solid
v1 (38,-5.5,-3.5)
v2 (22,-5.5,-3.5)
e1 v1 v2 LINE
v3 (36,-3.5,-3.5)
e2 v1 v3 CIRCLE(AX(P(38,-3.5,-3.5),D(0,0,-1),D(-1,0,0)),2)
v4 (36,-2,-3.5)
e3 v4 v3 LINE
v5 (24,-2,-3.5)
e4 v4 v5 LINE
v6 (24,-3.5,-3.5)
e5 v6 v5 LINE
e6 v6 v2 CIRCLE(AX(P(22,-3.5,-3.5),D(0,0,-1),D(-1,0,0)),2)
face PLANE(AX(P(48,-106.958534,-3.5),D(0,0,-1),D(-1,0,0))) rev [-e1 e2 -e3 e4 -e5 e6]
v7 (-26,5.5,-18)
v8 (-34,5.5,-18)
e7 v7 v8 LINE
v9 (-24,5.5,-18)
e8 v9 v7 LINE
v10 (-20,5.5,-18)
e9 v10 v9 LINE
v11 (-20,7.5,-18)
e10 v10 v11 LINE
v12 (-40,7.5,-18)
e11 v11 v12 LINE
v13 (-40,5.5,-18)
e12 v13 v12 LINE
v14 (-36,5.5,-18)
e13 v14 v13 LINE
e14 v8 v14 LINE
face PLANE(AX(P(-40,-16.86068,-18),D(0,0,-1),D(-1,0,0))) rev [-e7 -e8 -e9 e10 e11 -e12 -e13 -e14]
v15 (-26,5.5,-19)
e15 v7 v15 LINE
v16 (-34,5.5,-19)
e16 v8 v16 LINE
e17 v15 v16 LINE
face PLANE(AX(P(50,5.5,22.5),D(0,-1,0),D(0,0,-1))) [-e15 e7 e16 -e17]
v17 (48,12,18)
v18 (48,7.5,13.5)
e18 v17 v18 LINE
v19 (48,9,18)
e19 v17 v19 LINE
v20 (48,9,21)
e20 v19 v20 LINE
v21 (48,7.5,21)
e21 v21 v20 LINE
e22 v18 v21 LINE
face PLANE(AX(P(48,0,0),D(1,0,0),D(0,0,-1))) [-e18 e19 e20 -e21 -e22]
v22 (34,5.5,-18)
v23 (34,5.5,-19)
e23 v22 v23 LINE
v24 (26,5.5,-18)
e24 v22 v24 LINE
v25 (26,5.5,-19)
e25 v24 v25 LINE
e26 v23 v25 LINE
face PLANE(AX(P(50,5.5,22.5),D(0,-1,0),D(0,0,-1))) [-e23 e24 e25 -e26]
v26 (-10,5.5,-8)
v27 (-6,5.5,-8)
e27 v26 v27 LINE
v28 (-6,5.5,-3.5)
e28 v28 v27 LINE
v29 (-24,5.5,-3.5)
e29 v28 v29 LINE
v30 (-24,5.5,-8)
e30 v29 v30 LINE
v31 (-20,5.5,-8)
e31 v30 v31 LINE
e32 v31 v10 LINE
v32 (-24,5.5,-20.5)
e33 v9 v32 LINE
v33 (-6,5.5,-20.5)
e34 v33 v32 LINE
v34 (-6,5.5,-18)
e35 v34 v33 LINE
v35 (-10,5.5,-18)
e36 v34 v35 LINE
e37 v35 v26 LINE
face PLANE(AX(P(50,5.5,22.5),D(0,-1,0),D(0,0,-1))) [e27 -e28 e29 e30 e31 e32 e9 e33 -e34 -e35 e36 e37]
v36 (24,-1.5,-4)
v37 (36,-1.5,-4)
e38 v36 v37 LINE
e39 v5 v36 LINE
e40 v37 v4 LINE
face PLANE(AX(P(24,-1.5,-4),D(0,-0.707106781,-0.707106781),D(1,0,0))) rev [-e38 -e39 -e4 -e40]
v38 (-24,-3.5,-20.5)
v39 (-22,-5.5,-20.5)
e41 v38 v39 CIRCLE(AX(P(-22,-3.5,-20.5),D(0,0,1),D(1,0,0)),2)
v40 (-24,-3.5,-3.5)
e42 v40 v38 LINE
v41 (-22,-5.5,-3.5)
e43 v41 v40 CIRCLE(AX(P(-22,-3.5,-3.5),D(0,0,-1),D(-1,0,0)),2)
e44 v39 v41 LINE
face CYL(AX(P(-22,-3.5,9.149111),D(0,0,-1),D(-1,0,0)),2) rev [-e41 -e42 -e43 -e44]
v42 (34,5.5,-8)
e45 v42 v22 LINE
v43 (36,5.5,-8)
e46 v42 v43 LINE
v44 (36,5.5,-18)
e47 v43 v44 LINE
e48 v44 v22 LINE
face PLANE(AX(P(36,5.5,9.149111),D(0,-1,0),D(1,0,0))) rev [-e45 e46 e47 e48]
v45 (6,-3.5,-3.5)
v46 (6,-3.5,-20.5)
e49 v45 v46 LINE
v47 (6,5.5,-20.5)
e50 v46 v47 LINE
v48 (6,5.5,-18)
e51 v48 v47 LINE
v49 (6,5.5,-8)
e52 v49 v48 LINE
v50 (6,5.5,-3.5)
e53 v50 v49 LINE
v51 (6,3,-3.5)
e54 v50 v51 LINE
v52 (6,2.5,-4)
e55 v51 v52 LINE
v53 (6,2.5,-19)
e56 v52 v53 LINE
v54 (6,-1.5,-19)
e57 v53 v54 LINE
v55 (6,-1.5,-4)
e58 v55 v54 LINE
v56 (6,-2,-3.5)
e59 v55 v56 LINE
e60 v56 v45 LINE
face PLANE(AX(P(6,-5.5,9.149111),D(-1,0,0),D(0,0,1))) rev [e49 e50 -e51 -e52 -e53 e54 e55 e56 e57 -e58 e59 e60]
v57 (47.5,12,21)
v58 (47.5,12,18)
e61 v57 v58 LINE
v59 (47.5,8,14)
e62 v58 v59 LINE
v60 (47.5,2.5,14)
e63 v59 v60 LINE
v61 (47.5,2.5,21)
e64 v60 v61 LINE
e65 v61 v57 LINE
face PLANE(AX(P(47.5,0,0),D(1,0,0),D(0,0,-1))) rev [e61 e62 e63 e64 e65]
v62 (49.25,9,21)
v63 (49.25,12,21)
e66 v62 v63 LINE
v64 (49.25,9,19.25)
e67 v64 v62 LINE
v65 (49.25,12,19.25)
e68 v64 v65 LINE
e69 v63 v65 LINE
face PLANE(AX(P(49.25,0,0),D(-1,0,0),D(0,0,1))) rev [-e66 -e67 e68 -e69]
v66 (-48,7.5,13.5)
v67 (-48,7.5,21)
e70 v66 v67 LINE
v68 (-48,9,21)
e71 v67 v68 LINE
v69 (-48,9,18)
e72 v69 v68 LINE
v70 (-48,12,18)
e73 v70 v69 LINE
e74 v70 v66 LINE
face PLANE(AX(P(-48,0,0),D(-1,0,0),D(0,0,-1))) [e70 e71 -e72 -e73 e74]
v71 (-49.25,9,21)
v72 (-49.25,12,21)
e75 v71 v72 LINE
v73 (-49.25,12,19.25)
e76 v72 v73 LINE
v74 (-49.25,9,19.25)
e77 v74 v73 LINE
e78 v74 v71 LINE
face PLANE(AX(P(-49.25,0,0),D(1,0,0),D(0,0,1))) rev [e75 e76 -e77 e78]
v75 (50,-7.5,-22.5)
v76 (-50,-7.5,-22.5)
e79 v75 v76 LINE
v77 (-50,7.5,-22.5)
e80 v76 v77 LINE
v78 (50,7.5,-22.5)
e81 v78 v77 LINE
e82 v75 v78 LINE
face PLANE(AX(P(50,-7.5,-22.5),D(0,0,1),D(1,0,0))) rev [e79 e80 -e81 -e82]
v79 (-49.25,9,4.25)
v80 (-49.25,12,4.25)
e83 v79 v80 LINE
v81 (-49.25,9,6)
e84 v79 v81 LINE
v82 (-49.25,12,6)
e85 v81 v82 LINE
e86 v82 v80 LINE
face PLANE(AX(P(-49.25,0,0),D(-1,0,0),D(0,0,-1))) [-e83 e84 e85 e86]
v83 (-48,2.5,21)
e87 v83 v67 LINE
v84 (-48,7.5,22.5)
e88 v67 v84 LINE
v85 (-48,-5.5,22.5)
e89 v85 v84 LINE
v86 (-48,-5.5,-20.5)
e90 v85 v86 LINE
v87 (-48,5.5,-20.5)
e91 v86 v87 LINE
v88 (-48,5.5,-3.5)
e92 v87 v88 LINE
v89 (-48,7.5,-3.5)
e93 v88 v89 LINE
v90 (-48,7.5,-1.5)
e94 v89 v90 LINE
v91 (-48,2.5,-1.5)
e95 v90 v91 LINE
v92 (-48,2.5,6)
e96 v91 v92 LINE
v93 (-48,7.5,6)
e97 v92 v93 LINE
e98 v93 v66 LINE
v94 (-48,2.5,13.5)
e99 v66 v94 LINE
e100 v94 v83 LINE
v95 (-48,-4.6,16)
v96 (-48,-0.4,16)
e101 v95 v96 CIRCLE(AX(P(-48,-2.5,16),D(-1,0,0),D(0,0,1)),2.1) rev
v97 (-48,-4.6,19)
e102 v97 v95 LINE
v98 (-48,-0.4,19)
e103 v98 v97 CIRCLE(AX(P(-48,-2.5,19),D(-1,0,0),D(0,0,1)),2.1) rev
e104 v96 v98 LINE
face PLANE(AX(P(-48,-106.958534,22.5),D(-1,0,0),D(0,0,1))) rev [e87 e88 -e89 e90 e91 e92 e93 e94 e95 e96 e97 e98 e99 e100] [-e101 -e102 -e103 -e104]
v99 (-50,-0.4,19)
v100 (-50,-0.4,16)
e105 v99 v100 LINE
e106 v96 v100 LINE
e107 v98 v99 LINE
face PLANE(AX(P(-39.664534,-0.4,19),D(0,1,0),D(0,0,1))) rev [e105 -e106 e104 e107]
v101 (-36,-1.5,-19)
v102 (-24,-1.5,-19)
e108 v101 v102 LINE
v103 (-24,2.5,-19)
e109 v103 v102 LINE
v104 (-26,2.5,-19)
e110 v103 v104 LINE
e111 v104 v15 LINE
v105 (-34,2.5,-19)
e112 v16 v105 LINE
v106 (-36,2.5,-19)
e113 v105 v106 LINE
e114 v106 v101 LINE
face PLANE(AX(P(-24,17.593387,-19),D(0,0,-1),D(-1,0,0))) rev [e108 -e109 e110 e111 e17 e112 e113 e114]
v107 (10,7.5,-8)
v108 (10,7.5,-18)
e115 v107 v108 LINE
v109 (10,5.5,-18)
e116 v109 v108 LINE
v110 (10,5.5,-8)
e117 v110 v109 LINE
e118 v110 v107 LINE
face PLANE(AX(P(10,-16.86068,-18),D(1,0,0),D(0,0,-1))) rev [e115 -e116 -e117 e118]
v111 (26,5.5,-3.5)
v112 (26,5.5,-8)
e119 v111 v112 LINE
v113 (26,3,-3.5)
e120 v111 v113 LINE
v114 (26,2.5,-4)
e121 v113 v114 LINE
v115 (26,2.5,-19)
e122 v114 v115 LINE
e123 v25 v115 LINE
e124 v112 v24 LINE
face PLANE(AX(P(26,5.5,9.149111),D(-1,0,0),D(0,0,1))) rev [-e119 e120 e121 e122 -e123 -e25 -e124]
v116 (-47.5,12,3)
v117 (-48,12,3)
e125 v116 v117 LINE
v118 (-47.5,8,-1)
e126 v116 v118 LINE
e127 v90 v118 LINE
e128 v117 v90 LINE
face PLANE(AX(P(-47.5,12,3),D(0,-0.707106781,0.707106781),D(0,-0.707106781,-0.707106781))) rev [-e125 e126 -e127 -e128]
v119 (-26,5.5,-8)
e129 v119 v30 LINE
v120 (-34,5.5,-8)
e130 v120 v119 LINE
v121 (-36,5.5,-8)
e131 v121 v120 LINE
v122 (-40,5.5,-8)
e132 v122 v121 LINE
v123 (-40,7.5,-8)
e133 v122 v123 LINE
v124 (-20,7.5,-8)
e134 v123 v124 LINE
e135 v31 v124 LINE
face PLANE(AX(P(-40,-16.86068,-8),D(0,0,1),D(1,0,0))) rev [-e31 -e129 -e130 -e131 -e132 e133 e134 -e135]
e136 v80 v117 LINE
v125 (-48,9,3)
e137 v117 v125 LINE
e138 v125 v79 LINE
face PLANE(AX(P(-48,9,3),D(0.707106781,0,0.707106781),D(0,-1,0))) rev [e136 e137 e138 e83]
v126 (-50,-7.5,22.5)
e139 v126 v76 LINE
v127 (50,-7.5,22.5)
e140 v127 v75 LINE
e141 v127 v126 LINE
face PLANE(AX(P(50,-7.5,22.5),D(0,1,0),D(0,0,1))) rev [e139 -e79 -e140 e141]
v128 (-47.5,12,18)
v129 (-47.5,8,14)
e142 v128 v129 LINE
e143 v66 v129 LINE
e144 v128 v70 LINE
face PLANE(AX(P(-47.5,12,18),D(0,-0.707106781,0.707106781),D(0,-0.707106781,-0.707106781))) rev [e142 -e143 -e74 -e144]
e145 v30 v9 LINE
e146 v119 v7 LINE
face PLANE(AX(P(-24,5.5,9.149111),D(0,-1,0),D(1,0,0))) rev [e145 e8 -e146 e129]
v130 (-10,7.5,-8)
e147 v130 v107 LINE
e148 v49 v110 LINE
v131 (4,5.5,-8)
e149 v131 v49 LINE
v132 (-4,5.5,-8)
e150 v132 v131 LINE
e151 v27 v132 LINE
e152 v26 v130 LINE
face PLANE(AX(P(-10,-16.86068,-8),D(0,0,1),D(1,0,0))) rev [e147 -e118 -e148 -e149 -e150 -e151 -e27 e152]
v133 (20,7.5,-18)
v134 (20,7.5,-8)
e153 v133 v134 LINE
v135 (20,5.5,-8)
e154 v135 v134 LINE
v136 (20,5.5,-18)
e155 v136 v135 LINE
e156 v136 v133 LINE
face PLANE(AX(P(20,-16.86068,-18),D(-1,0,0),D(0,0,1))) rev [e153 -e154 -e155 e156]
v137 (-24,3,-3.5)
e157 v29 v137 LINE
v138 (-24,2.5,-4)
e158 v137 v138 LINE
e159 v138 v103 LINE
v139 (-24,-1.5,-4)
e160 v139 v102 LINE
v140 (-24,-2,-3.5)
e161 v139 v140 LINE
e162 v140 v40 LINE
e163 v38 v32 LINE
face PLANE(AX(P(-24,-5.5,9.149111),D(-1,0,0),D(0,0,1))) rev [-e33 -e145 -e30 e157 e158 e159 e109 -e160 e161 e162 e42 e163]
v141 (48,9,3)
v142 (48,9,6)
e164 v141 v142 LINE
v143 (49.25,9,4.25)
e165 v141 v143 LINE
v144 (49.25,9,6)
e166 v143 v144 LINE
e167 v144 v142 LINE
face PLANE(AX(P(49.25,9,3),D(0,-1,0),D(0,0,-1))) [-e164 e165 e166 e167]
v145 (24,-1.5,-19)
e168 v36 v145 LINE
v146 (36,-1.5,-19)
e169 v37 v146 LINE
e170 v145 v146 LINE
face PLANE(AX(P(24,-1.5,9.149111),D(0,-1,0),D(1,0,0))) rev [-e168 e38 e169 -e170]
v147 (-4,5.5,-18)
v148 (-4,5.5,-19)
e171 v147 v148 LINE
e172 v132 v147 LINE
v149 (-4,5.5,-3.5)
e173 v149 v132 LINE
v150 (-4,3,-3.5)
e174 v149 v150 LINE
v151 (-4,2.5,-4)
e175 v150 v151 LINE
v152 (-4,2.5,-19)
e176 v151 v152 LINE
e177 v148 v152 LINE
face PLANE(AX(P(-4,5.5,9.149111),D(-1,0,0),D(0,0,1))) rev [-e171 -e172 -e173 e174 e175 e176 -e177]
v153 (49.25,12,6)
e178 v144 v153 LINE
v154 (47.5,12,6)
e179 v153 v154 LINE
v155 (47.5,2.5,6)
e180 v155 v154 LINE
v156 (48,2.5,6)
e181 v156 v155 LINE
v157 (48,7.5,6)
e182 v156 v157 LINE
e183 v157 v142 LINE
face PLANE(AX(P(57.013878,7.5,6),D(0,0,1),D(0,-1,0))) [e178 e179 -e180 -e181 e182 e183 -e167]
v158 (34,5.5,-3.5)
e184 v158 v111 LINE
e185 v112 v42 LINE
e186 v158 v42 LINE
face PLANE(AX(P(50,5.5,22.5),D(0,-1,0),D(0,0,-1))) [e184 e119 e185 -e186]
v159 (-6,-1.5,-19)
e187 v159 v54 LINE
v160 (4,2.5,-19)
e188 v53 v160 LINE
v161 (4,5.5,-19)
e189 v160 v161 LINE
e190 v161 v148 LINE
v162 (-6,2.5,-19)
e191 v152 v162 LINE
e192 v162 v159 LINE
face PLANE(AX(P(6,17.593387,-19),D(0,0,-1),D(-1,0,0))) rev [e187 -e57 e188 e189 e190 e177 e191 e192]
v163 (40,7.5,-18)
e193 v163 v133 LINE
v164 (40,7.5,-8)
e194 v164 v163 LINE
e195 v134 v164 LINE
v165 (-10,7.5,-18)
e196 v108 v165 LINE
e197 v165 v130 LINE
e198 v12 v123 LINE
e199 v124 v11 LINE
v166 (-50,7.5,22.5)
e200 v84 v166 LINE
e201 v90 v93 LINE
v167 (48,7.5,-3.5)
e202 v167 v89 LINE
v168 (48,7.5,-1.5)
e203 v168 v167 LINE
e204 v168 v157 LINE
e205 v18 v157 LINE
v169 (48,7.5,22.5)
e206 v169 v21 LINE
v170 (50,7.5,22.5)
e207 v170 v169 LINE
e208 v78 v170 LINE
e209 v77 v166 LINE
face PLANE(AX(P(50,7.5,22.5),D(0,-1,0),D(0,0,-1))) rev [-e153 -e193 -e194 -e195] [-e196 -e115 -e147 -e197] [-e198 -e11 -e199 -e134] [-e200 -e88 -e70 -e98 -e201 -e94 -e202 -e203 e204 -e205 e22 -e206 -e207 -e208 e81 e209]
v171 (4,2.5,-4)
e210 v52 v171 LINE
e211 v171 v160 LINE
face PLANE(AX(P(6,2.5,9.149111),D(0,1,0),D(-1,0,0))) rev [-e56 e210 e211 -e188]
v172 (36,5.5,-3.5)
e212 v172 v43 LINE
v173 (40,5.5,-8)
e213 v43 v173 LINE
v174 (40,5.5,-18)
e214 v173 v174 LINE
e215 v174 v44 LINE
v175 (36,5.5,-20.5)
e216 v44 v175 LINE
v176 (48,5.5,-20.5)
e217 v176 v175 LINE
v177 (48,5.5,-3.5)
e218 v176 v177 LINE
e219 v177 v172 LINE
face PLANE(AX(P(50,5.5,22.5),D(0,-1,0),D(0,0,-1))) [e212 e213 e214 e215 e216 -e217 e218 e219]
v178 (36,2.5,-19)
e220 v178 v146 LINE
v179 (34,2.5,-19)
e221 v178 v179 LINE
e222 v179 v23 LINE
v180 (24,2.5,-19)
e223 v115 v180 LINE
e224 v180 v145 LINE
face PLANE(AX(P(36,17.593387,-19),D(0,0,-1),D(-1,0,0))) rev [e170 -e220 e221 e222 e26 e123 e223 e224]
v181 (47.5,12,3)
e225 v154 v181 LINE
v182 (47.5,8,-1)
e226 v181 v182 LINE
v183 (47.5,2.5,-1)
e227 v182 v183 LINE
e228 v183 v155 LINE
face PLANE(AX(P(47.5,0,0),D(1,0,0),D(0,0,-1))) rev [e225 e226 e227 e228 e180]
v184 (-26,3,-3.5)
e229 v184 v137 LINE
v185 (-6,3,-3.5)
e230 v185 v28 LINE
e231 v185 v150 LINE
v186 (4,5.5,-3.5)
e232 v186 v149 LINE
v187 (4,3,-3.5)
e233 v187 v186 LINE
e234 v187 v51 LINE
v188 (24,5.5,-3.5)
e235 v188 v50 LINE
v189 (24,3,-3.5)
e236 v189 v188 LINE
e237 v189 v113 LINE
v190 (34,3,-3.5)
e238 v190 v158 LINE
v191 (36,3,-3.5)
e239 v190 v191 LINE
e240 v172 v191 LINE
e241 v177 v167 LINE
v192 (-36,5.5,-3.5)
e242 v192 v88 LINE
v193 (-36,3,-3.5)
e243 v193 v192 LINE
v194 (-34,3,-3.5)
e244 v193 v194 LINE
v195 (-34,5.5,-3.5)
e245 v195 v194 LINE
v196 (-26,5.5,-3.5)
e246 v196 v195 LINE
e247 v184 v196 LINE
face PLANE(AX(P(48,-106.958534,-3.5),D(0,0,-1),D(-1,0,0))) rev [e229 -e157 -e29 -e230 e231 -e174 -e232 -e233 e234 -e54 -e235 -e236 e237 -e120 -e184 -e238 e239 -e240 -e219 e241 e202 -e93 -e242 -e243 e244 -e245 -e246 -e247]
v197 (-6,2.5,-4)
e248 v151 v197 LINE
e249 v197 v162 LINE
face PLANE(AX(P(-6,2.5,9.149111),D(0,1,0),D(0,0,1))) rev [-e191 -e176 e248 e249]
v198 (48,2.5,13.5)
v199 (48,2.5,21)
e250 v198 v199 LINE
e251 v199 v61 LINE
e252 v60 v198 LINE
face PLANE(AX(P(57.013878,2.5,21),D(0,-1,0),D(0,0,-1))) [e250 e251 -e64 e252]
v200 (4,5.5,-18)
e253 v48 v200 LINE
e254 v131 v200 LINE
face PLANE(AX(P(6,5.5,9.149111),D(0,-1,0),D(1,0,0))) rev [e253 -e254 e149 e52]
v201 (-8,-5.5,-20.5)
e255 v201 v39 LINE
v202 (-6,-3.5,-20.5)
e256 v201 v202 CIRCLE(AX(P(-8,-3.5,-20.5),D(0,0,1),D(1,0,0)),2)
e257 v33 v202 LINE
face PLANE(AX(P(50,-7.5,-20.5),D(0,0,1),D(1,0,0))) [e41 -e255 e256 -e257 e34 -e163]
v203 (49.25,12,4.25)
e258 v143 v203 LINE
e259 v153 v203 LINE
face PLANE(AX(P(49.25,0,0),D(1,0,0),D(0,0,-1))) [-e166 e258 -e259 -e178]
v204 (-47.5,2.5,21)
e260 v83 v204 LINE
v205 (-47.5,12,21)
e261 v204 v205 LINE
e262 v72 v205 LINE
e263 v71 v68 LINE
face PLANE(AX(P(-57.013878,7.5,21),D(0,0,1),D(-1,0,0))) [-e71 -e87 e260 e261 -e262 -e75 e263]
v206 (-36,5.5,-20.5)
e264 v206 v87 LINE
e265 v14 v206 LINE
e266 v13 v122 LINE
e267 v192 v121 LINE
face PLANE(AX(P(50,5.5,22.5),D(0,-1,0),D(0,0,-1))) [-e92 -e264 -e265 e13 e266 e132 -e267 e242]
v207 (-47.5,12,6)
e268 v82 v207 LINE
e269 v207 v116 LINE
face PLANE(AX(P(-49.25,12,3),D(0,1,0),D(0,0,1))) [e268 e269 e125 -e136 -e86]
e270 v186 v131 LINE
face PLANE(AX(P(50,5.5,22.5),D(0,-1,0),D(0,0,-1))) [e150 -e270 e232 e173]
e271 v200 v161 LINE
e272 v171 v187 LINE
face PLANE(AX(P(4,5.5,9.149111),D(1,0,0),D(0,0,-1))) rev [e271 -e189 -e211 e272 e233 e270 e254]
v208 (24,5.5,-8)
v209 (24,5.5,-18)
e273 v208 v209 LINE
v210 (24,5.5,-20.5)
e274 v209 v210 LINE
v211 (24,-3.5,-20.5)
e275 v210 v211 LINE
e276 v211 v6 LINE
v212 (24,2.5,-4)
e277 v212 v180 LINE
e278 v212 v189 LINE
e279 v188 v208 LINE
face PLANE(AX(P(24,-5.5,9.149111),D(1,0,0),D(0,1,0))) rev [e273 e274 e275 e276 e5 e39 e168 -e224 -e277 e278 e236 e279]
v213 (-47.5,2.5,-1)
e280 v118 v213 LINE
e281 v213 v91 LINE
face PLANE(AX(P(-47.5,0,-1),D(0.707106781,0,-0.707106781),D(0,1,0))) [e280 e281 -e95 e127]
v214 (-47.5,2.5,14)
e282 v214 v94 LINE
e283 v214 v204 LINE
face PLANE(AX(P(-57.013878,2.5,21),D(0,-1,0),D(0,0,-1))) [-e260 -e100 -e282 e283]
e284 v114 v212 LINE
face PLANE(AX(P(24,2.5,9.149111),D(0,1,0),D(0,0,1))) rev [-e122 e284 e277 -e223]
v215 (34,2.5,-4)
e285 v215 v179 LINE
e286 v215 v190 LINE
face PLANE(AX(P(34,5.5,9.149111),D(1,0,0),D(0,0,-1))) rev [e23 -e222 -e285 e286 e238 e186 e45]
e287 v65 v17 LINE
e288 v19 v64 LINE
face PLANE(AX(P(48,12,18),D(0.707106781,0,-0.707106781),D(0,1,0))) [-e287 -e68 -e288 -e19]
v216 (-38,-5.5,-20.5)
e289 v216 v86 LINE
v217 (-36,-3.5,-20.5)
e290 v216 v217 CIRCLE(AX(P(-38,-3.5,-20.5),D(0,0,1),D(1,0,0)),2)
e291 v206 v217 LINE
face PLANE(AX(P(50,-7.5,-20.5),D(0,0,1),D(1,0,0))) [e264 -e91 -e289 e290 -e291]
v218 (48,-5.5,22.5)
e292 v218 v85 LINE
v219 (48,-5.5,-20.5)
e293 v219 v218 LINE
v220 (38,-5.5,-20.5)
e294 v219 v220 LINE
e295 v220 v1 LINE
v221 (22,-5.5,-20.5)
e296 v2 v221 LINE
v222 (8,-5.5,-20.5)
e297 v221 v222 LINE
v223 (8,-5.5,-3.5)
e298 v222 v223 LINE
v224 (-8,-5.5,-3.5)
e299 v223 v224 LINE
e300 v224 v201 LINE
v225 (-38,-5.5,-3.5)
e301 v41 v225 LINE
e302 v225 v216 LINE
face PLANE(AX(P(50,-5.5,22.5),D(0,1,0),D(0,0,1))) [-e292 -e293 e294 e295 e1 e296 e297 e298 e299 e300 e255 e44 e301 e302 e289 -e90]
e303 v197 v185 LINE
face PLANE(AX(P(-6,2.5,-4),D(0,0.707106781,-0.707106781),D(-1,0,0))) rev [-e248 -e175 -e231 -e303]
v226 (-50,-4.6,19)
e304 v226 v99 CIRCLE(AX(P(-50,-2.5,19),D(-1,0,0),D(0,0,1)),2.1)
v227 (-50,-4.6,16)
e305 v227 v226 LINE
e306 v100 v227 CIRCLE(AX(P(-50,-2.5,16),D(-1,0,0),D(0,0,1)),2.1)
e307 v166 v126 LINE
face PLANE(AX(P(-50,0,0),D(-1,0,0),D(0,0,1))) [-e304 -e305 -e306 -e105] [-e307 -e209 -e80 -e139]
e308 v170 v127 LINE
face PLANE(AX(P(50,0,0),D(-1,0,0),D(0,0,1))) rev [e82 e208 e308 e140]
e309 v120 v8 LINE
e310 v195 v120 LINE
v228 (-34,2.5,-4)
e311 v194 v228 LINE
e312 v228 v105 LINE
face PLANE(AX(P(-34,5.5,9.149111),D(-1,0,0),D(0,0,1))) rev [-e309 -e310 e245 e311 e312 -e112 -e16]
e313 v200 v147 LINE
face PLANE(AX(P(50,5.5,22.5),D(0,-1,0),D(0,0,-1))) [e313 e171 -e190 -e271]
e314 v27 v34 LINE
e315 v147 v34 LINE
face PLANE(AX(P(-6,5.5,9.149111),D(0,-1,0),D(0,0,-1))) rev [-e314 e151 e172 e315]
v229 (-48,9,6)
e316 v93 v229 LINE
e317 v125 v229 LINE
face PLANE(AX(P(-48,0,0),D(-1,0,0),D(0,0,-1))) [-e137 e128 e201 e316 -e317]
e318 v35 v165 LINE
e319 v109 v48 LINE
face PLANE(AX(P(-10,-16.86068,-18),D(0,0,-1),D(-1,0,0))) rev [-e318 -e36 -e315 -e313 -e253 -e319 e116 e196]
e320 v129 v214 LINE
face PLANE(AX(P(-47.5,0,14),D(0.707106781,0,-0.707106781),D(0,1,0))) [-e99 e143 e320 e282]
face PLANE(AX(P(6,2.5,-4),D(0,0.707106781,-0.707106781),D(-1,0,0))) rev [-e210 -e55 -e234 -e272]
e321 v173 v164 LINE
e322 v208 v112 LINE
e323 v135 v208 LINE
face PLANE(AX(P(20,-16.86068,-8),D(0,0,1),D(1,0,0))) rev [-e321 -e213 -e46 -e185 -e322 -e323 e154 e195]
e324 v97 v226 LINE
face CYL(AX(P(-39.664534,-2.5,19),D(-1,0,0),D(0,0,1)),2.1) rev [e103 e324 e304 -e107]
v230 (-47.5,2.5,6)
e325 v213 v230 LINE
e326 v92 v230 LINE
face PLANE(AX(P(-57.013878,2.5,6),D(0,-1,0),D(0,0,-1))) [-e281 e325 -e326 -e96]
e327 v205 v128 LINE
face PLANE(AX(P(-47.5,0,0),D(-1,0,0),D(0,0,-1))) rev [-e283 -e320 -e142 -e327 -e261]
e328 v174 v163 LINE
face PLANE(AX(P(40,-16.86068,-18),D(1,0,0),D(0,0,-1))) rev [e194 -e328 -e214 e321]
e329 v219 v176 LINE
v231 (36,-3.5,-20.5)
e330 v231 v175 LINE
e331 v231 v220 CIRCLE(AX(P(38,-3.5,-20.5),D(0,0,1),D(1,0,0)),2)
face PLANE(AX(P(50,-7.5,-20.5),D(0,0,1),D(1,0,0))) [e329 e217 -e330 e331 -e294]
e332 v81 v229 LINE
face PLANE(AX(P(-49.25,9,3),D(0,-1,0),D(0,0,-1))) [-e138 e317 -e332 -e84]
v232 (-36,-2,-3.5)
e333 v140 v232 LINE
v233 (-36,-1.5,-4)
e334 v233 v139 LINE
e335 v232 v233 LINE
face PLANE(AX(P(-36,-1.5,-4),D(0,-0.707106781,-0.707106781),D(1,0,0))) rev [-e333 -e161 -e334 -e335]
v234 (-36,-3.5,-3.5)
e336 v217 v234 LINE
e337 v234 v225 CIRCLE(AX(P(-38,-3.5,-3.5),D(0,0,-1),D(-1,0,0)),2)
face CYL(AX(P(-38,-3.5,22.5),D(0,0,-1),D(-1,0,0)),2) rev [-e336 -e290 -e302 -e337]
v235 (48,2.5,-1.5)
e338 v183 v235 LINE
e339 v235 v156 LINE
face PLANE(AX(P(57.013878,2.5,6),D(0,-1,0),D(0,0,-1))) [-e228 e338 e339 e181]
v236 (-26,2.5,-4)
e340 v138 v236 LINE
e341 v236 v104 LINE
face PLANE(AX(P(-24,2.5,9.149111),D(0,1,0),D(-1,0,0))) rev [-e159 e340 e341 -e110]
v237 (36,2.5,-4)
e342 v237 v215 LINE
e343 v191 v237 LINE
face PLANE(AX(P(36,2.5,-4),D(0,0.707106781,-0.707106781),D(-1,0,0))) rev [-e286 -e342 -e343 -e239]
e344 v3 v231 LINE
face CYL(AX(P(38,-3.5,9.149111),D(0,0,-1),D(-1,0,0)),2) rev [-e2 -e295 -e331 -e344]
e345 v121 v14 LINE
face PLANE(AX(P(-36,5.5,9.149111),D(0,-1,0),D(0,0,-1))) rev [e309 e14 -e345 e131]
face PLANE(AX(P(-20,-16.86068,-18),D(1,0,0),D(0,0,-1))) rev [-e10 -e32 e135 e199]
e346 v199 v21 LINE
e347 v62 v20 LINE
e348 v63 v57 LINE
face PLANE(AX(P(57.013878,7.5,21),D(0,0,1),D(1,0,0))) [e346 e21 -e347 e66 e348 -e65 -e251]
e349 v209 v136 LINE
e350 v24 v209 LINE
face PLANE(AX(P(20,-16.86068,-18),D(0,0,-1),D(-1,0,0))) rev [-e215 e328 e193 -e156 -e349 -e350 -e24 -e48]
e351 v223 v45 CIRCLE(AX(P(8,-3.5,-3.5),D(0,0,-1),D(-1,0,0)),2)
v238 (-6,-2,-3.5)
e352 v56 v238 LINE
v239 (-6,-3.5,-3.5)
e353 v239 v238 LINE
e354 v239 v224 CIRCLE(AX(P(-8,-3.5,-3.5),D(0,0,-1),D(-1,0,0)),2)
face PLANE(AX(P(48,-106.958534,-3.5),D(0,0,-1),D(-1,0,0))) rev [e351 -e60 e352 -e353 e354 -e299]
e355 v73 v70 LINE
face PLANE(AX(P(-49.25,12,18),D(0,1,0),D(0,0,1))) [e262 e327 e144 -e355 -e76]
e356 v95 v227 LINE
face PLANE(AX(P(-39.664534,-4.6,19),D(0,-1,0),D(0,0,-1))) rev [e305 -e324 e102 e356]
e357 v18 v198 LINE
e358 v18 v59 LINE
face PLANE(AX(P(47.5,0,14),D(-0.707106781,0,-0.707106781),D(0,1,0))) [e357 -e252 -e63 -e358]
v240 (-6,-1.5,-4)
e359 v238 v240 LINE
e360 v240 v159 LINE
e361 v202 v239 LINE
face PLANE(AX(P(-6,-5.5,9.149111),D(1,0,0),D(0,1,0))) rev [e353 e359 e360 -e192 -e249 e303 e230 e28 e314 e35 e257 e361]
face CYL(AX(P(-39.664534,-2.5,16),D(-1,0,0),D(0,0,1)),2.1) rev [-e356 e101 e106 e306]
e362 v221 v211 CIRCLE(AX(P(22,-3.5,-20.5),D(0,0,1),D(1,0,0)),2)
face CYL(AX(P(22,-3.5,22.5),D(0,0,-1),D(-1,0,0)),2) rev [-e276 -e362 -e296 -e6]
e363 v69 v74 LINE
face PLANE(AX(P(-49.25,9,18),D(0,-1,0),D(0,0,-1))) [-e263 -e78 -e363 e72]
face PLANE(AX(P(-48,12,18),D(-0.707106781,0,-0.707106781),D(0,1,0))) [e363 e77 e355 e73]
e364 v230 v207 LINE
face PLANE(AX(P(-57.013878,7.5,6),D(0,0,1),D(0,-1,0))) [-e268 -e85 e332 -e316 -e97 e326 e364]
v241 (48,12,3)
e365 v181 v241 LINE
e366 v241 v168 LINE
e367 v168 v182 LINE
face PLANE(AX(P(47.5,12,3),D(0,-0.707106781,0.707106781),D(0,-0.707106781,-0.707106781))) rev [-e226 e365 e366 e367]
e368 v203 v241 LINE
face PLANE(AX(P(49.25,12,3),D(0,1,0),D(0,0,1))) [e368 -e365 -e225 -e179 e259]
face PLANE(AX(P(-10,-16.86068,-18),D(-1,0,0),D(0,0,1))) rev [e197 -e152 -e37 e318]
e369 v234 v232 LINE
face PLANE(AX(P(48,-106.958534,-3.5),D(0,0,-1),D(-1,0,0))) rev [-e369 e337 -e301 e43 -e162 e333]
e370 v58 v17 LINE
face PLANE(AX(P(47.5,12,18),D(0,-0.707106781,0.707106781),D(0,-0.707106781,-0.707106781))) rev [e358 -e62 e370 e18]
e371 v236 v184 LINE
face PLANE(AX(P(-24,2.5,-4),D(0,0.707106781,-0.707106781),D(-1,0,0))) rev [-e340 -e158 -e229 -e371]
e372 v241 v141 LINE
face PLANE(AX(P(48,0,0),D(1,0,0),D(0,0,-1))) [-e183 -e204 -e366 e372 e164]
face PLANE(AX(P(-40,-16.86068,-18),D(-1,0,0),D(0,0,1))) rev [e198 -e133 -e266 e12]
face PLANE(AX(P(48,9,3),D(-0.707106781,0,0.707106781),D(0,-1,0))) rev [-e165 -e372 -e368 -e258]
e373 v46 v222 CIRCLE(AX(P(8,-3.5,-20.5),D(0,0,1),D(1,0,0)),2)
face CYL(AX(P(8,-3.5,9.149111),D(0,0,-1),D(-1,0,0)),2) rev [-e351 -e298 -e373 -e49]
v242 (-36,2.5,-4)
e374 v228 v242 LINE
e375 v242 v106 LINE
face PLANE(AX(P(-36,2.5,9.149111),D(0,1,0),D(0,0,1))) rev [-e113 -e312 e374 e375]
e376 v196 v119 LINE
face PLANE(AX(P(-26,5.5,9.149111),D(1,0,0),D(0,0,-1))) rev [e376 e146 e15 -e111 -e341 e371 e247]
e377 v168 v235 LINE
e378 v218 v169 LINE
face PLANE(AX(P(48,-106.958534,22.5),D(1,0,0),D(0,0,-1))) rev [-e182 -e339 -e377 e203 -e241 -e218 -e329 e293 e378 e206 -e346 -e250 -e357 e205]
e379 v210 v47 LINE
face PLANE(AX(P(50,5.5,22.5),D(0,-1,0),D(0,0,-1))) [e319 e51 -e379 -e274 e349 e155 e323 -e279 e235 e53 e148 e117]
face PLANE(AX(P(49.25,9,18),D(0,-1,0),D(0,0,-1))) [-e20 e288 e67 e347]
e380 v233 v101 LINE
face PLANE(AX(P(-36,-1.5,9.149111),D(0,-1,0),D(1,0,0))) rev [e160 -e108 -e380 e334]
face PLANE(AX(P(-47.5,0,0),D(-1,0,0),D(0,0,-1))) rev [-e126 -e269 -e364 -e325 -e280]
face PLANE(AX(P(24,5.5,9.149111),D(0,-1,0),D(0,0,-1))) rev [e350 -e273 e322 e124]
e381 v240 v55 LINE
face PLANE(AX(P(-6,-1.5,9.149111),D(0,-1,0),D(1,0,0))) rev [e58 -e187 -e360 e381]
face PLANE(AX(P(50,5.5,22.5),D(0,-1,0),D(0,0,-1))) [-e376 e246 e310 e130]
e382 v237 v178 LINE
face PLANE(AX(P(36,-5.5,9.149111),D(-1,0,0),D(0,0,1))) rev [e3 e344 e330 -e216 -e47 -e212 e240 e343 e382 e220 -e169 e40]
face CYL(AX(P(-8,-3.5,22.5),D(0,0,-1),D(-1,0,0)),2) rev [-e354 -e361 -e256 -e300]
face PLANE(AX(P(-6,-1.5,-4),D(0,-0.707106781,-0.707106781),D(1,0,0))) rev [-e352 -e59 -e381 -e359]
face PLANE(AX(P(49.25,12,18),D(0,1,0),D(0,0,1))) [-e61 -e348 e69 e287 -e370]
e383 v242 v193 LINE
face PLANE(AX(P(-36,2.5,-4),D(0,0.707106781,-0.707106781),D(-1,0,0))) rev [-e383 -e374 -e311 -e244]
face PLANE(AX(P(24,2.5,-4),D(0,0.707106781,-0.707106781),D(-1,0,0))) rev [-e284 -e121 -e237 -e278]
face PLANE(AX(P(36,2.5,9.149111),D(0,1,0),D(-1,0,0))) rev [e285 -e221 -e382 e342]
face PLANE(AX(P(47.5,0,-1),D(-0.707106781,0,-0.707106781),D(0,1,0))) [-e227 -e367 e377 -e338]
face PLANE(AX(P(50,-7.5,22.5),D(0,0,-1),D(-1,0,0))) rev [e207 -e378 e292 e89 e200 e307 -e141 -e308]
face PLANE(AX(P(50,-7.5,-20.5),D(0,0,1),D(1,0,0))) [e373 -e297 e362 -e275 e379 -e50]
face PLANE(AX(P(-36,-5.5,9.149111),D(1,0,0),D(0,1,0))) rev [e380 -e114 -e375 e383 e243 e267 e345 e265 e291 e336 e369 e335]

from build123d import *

# Parameters (mm, degrees)
SKETCH1_W                  = 45
SKETCH1_H                  = 15
BOSS_EXTRUDE1_DEPTH        = 50
SKETCH2_W                  = 96
SKETCH2_H                  = 26
CUT_EXTRUDE1_DEPTH         = 13
SHELL1_START               = -48
SHELL1_OUTLINE_W           = 11
SHELL1_OUTLINE_H           = 17
SHELL1_DEPTH               = 96
SKETCH3_W                  = 20
SKETCH3_H                  = 10
CUT_EXTRUDE2_DEPTH         = 2
LPATTERN1_COUNT            = 2
LPATTERN1_PITCH            = 30
LPATTERN1_COL_COUNT        = 2
LPATTERN1_COL_PITCH        = 30
BOSS_EXTRUDE2_REACH        = 68.372
SKETCH4_W                  = 12
SKETCH4_H                  = 4
SKETCH4_W_2                = 2
SKETCH4_H_2                = 3
SKETCH5_W                  = 12
SKETCH5_H                  = 1.5
BOSS_EXTRUDE3_DEPTH        = 7
CHAMFER1_SIZE              = 0.5
FILLET1_R                  = 2
LPATTERN2_COUNT            = 3
LPATTERN2_PITCH            = 30
CHAMFER1_OF_LPATTERN2_SIZE = 0.5
FILLET1_OF_LPATTERN2_R     = 2
SKETCH6_W                  = 3
SKETCH6_H                  = 3
BOSS_EXTRUDE4_DEPTH        = 1.25
BOSS_EXTRUDE4_2_DEPTH      = 1.25
BOSS_EXTRUDE5_DEPTH        = 0.5
SKETCH8_W                  = 7.5
SKETCH8_H                  = 5
BOSS_EXTRUDE6_DEPTH        = 0.5
CHAMFER2_SIZE              = 0.5
CHAMFER4_SIZE              = 1.25
CHAMFER2_OF_MIRROR7_SIZE   = 0.5
CHAMFER4_OF_MIRROR7_SIZE   = 1.25
CUT_EXTRUDE3_DEPTH         = 2


# Read off the part's stored shape, not the designer's step: Shell1
with BuildPart() as part:
    # Sketch1 → Boss-Extrude1 (new, symmetric)
    with BuildSketch(Plane(origin=(0, 0, 0), x_dir=(0, 0, -1), z_dir=(1, 0, 0))):
        Rectangle(SKETCH1_W, SKETCH1_H)
    extrude(amount=BOSS_EXTRUDE1_DEPTH, both=True)

    # Sketch2 → Cut-Extrude1 (cut)
    with BuildSketch(Plane(origin=(0, 7.5, 0), x_dir=(1, 0, 0), z_dir=(0, 1, 0))):
        with Locations((0, -9.5)):
            Rectangle(SKETCH2_W, SKETCH2_H)
    extrude(amount=-CUT_EXTRUDE1_DEPTH, mode=Mode.SUBTRACT)

    # Shell1 outline → Shell1 (cut)
    with BuildSketch(Plane.YZ.offset(SHELL1_START)):
        with Locations((0, -12)):
            Rectangle(SHELL1_OUTLINE_W, SHELL1_OUTLINE_H)
    extrude(amount=SHELL1_DEPTH, mode=Mode.SUBTRACT)

    # Sketch3 → Cut-Extrude2 (cut)
    with BuildSketch(Plane(origin=(0, 7.5, 0), x_dir=(1, 0, 0), z_dir=(0, 1, 0))):
        with Locations((0, 13)):
            Rectangle(SKETCH3_W, SKETCH3_H)
    cut_extrude2 = extrude(amount=-CUT_EXTRUDE2_DEPTH, mode=Mode.SUBTRACT)

    # LPattern1: Cut-Extrude2 ×2
    with Locations(*[(-i * LPATTERN1_PITCH, 0, 0) for i in range(1, LPATTERN1_COUNT)]):
        add(cut_extrude2, mode=Mode.SUBTRACT)

    # LPattern1 col: Cut-Extrude2 ×2
    with Locations(*[(i * LPATTERN1_COL_PITCH, 0, 0) for i in range(1, LPATTERN1_COL_COUNT)]):
        add(cut_extrude2, mode=Mode.SUBTRACT)

    # Boss-Extrude2: up to this face of the body (flat: up to its plane)
    boss_extrude2_end = Plane(part.part.faces().sort_by_distance((0, 6.5, -3.5))[0])
    # Sketch4 → Boss-Extrude2 (add, up to the picked face)
    with BuildSketch(Plane.XY.offset(-20.5), mode=Mode.PRIVATE) as boss_extrude2_sk1:
        with Locations((-30, -3.5)):
            Rectangle(SKETCH4_W, SKETCH4_H)
    boss_extrude2_tool1 = split(extrude(boss_extrude2_sk1.sketch, amount=BOSS_EXTRUDE2_REACH, mode=Mode.PRIVATE), bisect_by=boss_extrude2_end, keep=Keep.BOTH, mode=Mode.PRIVATE)
    # Sketch4 → Boss-Extrude2 (add, up to the picked face)
    with BuildSketch(Plane.XY.offset(-20.5), mode=Mode.PRIVATE) as boss_extrude2_sk2:
        with Locations((-35, 4)):
            Rectangle(SKETCH4_W_2, SKETCH4_H_2)
    boss_extrude2_tool2 = split(extrude(boss_extrude2_sk2.sketch, amount=BOSS_EXTRUDE2_REACH, mode=Mode.PRIVATE), bisect_by=boss_extrude2_end, keep=Keep.BOTH, mode=Mode.PRIVATE)
    # Sketch4 → Boss-Extrude2 (add, up to the picked face)
    with BuildSketch(Plane.XY.offset(-20.5), mode=Mode.PRIVATE) as boss_extrude2_sk3:
        with Locations((-25, 4)):
            Rectangle(SKETCH4_W_2, SKETCH4_H_2)
    boss_extrude2_tool3 = split(extrude(boss_extrude2_sk3.sketch, amount=BOSS_EXTRUDE2_REACH, mode=Mode.PRIVATE), bisect_by=boss_extrude2_end, keep=Keep.BOTH, mode=Mode.PRIVATE)
    boss_extrude2_1 = boss_extrude2_tool1.solids().sort_by(Axis((-30, -3.5, -20.5), (0, 0, 1)))[0]
    add(boss_extrude2_1)
    boss_extrude2_2 = boss_extrude2_tool2.solids().sort_by(Axis((-35, 4, -20.5), (0, 0, 1)))[0]
    add(boss_extrude2_2)
    boss_extrude2_3 = boss_extrude2_tool3.solids().sort_by(Axis((-25, 4, -20.5), (0, 0, 1)))[0]
    add(boss_extrude2_3)
    boss_extrude2 = boss_extrude2_1 + boss_extrude2_2 + boss_extrude2_3  # Boss-Extrude2 as one shape, for the pattern or mirror that repeats it

    # Sketch5 → Boss-Extrude3 (add)
    with BuildSketch(Plane(origin=(0, -1.5, 0), x_dir=(1, 0, 0), z_dir=(0, 1, 0))):
        with Locations((-30, 19.75)):
            Rectangle(SKETCH5_W, SKETCH5_H)
    boss_extrude3 = extrude(amount=BOSS_EXTRUDE3_DEPTH)

    # Chamfer1
    chamfer1_edges = [part.edges().sort_by_distance(p)[0] for p in [
        (-35, 2.5, -3.5),
        (-25, 2.5, -3.5),
        (-30, -1.5, -3.5),
    ]]
    chamfer(chamfer1_edges, length=CHAMFER1_SIZE)

    # Fillet1
    fillet1_edges = [part.edges().sort_by_distance(p)[0] for p in [
        (-24, -5.5, -12),
        (-36, -5.5, -12),
    ]]
    fillet(fillet1_edges, radius=FILLET1_R)

    # LPattern2: Boss-Extrude2, Boss-Extrude3 ×3
    with Locations(*[(i * LPATTERN2_PITCH, 0, 0) for i in range(1, LPATTERN2_COUNT)]):
        add(boss_extrude2)
        add(boss_extrude3)

    # Chamfer1 of LPattern2
    chamfer1_of_lpattern2_edges = [part.edges().sort_by_distance(p)[0] for p in [
        (-5, 2.5, -3.5),
        (5, 2.5, -3.5),
        (0, -1.5, -3.5),
        (25, 2.5, -3.5),
        (35, 2.5, -3.5),
        (30, -1.5, -3.5),
    ]]
    chamfer(chamfer1_of_lpattern2_edges, length=CHAMFER1_OF_LPATTERN2_SIZE)

    # Fillet1 of LPattern2
    fillet1_of_lpattern2_edges = [part.edges().sort_by_distance(p)[0] for p in [
        (6, -5.5, -12),
        (-6, -5.5, -12),
        (36, -5.5, -12),
        (24, -5.5, -12),
    ]]
    fillet(fillet1_of_lpattern2_edges, radius=FILLET1_OF_LPATTERN2_R)



with BuildPart() as body_2:
    # Sketch6 → Boss-Extrude4 (new body)
    with BuildSketch(Plane.ZY.offset(-48)):
        with Locations((19.5, 10.5)):
            Rectangle(SKETCH6_W, SKETCH6_H)
    boss_extrude4 = extrude(amount=-BOSS_EXTRUDE4_DEPTH)



with BuildPart() as body_3:
    # Sketch6 → Boss-Extrude4 2 (new body)
    with BuildSketch(Plane.ZY.offset(-48)):
        with Locations((4.5, 10.5)):
            Rectangle(SKETCH6_W, SKETCH6_H)
    boss_extrude4_2 = extrude(amount=-BOSS_EXTRUDE4_2_DEPTH)


with BuildPart() as body_2_1:
    add(body_2.part)

    add(body_3.part)  # Boss-Extrude5 merges body 3
    # Sketch7 → Boss-Extrude5 (add)
    with BuildSketch(Plane.ZY.offset(-48)):
        Polygon((18, 12), (13.5, 7.5), (21, 7.5), (21, 12), align=None)
        Polygon((3, 12), (-1.5, 7.5), (6, 7.5), (6, 12), align=None)
    boss_extrude5 = extrude(amount=BOSS_EXTRUDE5_DEPTH)


with BuildPart() as part_1:
    add(part.part)

    add(body_2_1.part)  # Boss-Extrude6 merges body 2
    # Sketch8 → Boss-Extrude6 (add)
    with BuildSketch(Plane.ZY.offset(-47.5)):
        with Locations((2.25, 5)):
            Rectangle(SKETCH8_W, SKETCH8_H)
        with Locations((17.25, 5)):
            Rectangle(SKETCH8_W, SKETCH8_H)
    boss_extrude6 = extrude(amount=-BOSS_EXTRUDE6_DEPTH)

    # Chamfer2
    chamfer2_edges = [part_1.edges().sort_by_distance(p)[0] for p in [
        (47.5, 5, -1.5),
        (47.5, 5, 13.5),
    ]]
    chamfer(chamfer2_edges, length=CHAMFER2_SIZE - 0.0001)  # a hair under: the kernel refuses the full size

    # Chamfer4
    chamfer4_edges = [part_1.edges().sort_by_distance(p)[0] for p in [
        (49.25, 10.5, 3),
        (49.25, 10.5, 18),
    ]]
    chamfer(chamfer4_edges, length=CHAMFER4_SIZE - 0.0001)  # a hair under: the kernel refuses the full size

    # Mirror7: Boss-Extrude4, Boss-Extrude4 2, Boss-Extrude5, Boss-Extrude6 across plane
    add(boss_extrude4.mirror(Plane(origin=(0, 0, 0), x_dir=(0, 0, 1), z_dir=(1, 0, 0))))
    add(boss_extrude4_2.mirror(Plane(origin=(0, 0, 0), x_dir=(0, 0, 1), z_dir=(1, 0, 0))))
    add(boss_extrude5.mirror(Plane(origin=(0, 0, 0), x_dir=(0, 0, 1), z_dir=(1, 0, 0))))
    add(boss_extrude6.mirror(Plane(origin=(0, 0, 0), x_dir=(0, 0, 1), z_dir=(1, 0, 0))))

    # Chamfer2 of Mirror7
    chamfer2_of_mirror7_edges = [part_1.edges().sort_by_distance(p)[0] for p in [
        (-47.5, 5, -1.5),
        (-47.5, 5, 13.5),
    ]]
    chamfer(chamfer2_of_mirror7_edges, length=CHAMFER2_OF_MIRROR7_SIZE - 0.0001)  # a hair under: the kernel refuses the full size

    # Chamfer4 of Mirror7
    chamfer4_of_mirror7_edges = [part_1.edges().sort_by_distance(p)[0] for p in [
        (-49.25, 10.5, 3),
        (-49.25, 10.5, 18),
    ]]
    chamfer(chamfer4_of_mirror7_edges, length=CHAMFER4_OF_MIRROR7_SIZE - 0.0001)  # a hair under: the kernel refuses the full size

    # Sketch10 → Cut-Extrude3 (cut)
    with BuildSketch(Plane.ZY.offset(50)):
        with BuildLine():
            Line((19, -4.6), (16, -4.6))
            ThreePointArc((16, -4.6), (13.9, -2.5), (16, -0.4))
            Line((16, -0.4), (19, -0.4))
            ThreePointArc((19, -0.4), (21.1, -2.5), (19, -4.6))
        make_face()
    extrude(amount=-CUT_EXTRUDE3_DEPTH, mode=Mode.SUBTRACT)


solid = part_1.part
